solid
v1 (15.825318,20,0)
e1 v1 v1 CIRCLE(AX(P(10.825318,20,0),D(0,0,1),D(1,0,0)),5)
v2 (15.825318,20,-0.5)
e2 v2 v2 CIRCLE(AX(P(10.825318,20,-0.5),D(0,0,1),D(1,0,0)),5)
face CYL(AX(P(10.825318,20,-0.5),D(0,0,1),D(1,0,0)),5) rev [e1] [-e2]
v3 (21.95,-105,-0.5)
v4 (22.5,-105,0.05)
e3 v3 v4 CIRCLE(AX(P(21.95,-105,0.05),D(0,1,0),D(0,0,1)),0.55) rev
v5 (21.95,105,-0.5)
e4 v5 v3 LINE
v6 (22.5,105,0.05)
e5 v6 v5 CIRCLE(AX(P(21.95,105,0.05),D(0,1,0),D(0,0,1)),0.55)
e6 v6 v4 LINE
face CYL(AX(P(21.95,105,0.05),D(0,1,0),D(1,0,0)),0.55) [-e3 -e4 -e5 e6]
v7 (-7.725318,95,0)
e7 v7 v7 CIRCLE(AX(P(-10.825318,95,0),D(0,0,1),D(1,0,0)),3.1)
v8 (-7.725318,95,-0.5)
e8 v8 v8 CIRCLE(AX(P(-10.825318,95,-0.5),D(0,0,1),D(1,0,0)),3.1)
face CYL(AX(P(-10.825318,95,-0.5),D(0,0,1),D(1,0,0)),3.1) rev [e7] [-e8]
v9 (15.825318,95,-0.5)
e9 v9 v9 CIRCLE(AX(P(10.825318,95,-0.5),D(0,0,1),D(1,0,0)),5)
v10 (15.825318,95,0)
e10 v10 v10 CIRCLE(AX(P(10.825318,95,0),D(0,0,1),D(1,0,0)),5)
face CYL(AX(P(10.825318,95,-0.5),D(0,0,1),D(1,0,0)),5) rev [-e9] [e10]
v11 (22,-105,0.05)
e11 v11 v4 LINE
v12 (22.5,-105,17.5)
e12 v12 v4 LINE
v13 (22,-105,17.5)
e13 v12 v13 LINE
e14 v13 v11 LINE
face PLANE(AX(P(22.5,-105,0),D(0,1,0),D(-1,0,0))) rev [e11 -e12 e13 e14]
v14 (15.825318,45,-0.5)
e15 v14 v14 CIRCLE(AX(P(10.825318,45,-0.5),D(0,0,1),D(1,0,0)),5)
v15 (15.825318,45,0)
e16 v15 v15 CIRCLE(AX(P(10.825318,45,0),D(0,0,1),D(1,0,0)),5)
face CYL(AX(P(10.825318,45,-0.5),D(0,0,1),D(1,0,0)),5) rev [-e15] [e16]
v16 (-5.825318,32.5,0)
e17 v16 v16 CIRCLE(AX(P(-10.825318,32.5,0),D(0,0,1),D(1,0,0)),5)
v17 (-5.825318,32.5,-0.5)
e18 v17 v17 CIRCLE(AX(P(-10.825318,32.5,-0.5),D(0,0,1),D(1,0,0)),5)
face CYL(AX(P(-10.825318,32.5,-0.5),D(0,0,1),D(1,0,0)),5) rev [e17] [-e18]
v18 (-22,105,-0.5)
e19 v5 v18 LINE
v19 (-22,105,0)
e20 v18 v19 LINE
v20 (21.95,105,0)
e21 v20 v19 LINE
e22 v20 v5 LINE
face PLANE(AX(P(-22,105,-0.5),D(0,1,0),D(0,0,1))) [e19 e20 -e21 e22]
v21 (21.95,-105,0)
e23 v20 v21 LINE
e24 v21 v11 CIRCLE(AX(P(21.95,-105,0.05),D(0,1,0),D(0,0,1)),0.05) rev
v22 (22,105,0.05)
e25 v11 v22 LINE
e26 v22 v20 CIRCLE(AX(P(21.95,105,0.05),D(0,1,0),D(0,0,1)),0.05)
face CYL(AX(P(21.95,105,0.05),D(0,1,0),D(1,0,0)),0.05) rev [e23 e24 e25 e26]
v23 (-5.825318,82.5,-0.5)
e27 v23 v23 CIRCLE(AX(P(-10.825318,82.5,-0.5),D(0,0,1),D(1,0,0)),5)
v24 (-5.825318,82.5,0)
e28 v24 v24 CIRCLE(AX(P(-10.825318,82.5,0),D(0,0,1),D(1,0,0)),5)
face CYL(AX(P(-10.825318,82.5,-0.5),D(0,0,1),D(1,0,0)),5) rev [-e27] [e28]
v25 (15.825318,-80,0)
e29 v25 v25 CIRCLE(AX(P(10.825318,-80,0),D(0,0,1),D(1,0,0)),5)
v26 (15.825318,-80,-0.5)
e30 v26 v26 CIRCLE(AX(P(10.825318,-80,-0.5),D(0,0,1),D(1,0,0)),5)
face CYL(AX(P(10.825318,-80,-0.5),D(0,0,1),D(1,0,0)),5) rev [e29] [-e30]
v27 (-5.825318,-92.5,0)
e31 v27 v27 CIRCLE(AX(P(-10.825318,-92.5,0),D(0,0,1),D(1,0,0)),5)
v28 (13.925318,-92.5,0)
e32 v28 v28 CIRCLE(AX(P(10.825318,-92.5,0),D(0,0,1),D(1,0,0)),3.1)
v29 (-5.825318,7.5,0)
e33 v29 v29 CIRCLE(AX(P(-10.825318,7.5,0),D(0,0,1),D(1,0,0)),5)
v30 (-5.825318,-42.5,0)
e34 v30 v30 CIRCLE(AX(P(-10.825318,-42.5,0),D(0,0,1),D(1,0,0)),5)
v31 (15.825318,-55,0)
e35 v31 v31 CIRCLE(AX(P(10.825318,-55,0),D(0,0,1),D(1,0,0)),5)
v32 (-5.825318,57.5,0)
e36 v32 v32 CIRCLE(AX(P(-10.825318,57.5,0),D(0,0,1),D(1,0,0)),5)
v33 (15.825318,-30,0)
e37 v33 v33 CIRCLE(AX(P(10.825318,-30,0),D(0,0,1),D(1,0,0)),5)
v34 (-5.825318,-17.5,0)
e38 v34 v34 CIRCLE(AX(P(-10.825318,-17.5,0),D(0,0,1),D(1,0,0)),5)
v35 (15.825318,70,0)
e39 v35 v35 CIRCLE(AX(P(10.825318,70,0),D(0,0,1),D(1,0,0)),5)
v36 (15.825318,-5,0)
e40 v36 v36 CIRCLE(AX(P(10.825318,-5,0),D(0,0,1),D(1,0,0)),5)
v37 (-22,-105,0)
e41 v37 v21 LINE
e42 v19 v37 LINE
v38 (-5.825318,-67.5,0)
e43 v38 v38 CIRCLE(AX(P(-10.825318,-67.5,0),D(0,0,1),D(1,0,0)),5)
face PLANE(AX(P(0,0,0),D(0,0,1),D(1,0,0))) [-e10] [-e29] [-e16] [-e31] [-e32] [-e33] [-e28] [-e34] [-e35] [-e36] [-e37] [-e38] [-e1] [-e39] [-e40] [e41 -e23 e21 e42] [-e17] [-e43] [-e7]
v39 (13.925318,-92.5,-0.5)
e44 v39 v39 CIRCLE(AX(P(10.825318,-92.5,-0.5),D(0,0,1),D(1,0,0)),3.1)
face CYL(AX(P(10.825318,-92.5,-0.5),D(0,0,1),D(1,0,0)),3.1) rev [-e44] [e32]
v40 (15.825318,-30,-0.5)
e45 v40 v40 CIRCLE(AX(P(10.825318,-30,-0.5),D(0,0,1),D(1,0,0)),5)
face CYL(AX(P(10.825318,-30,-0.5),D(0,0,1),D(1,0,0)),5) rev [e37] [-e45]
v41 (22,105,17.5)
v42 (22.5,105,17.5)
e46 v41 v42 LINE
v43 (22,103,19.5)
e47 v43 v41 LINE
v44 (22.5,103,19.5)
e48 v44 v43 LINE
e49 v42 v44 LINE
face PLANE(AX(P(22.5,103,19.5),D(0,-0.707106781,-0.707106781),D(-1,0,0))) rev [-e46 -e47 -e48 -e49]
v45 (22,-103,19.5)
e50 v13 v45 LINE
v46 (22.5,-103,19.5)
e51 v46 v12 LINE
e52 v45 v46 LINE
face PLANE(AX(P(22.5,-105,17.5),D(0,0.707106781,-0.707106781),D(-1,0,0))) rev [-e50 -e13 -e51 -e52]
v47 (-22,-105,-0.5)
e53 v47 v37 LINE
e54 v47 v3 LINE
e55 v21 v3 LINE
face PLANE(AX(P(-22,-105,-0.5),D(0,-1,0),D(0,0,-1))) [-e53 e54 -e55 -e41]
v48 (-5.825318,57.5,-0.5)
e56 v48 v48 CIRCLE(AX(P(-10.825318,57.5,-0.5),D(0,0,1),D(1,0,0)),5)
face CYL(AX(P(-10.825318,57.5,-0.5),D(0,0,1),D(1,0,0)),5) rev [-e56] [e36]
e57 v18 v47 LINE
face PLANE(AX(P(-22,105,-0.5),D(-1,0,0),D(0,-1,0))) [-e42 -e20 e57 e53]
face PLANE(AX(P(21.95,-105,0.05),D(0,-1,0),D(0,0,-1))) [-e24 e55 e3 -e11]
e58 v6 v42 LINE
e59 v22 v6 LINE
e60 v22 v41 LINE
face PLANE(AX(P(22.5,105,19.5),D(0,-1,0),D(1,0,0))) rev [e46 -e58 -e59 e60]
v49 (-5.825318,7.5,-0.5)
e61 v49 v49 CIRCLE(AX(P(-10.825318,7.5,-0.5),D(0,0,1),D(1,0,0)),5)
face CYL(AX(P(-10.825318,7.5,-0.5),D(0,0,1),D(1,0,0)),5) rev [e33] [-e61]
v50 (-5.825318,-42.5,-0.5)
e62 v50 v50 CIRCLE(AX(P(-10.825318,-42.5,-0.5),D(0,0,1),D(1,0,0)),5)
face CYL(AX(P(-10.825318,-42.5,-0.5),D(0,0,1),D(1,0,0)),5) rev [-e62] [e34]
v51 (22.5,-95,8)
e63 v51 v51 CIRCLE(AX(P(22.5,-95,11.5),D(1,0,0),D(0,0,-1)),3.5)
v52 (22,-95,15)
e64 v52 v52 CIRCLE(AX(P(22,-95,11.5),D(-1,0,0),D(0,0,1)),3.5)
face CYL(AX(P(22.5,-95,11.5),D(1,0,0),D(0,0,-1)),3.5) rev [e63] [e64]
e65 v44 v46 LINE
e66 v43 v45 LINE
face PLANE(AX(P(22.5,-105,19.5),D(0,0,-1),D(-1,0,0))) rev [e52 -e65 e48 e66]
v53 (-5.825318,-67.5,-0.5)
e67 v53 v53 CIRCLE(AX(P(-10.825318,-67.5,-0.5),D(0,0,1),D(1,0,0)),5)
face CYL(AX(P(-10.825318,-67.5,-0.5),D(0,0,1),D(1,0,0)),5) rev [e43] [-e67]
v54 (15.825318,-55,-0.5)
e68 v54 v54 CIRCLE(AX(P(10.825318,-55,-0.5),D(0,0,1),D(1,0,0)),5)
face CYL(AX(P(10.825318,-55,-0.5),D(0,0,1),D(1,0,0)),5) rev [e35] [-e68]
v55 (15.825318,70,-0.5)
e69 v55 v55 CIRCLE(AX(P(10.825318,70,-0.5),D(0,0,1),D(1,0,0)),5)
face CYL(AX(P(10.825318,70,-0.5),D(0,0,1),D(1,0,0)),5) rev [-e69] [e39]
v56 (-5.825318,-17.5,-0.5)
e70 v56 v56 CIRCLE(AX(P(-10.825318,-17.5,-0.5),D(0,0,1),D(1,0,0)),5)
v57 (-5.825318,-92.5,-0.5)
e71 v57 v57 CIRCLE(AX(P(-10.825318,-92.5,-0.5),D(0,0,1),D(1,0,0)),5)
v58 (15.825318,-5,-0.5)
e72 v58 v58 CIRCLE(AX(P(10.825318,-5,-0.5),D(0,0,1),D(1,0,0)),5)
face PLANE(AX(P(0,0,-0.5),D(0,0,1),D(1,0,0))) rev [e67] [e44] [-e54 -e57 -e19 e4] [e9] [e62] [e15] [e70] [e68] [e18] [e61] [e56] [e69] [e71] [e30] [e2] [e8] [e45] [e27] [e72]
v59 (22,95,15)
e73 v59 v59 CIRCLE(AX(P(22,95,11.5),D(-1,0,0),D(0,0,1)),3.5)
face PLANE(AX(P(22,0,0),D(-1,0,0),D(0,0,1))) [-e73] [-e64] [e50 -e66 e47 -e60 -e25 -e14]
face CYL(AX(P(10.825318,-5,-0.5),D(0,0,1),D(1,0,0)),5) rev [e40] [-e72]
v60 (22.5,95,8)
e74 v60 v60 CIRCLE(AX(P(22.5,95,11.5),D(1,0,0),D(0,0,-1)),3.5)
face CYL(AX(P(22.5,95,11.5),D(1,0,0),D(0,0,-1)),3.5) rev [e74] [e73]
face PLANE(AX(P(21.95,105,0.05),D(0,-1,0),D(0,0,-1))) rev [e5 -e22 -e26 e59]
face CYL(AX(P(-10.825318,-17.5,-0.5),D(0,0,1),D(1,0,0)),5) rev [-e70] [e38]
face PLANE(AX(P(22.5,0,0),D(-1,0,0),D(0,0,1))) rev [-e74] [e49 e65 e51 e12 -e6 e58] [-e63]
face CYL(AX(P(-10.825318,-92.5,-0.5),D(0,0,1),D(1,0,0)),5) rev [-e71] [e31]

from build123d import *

# Parameters (mm, degrees)
SKETCH1_W                    = 44
SKETCH1_H                    = 210
BASE_FLANGE1_DEPTH           = 0.5
SKETCH6_R                    = 5
CUT_EXTRUDE1_DEPTH           = 108.281172626
LPATTERN1_COUNT              = 8
LPATTERN1_PITCH              = 25
EDGE_FLANGE1_STRIP_W         = 2.1
EDGE_FLANGE1_STRIP_H         = 0.5
EDGE_FLANGE1_STRIP_CUT_DEPTH = 210
EDGE_FLANGE1_DEPTH           = 210
F_7_0_7_DIAMETER_HOLE1_D     = 7
F_7_0_7_DIAMETER_HOLE1_DEPTH = 60
F_7_0_7_DIAMETER_HOLE1_TIP   = 2.103012167
BREAK_CORNER1_START          = 22
BREAK_CORNER1_DEPTH          = 0.5
CUT_EXTRUDE2_DEPTH           = 110.139818581
CUT_EXTRUDE2_DEPTH_BACK      = 110.139818581
SKETCH13_R                   = 3.1


# Read off the part's stored shape, not the designer's step: Break-Corner1
# Sheet-metal steps are written as plain solids
with BuildPart() as part:
    # Sketch1 → Base-Flange1 (new body)
    with BuildSketch(Plane.XY):
        Rectangle(SKETCH1_W, SKETCH1_H)
    extrude(amount=-BASE_FLANGE1_DEPTH)

    # Sketch6 → Cut-Extrude1 (cut, symmetric)
    with BuildSketch(Plane.XY):
        with Locations((10.825317547, 95)):
            Circle(SKETCH6_R)
        with Locations((-10.825317547, 82.5)):
            Circle(SKETCH6_R)
    cut_extrude1 = extrude(amount=CUT_EXTRUDE1_DEPTH, both=True, mode=Mode.SUBTRACT)

    # LPattern1: Cut-Extrude1 ×8
    with Locations(*[(0, -i * LPATTERN1_PITCH, 0) for i in range(1, LPATTERN1_COUNT)]):
        add(cut_extrude1, mode=Mode.SUBTRACT)

    # Edge-Flange1 strip (across the edge) → Edge-Flange1 strip cut (cut)
    with BuildSketch(Plane(origin=(22, -105, 0), x_dir=(-1, 0, 0), z_dir=(0, 1, 0))):
        with Locations((-1, -0.25)):
            Rectangle(EDGE_FLANGE1_STRIP_W, EDGE_FLANGE1_STRIP_H)
    extrude(amount=EDGE_FLANGE1_STRIP_CUT_DEPTH, mode=Mode.SUBTRACT)

    # Edge-Flange1 section (across the edge) → Edge-Flange1 (add)
    with BuildSketch(Plane(origin=(22, -105, 0), x_dir=(-1, 0, 0), z_dir=(0, 1, 0))):
        with BuildLine():
            Line((-0.5, 0.05), (-0.5, 19.5))
            Line((-0.5, 19.5), (0, 19.5))
            Line((0, 19.5), (0, 0.05))
            ThreePointArc((0, 0.05), (0.014644661, 0.014644661), (0.05, 0))
            Line((0.05, 0), (0.05, -0.5))
            ThreePointArc((0.05, -0.5), (-0.33890873, -0.33890873), (-0.5, 0.05))
        make_face()
    extrude(amount=EDGE_FLANGE1_DEPTH)

    # Ø7.0 (7) Diameter Hole1
    with Locations(Plane(origin=(22.5, 0, 0), x_dir=(0, 0, -1), z_dir=(1, 0, 0))):
        with Locations((-11.5, 95), (-11.5, -95)):
            Hole(F_7_0_7_DIAMETER_HOLE1_D / 2, depth=F_7_0_7_DIAMETER_HOLE1_DEPTH)
            with Locations((0, 0, -(F_7_0_7_DIAMETER_HOLE1_DEPTH + F_7_0_7_DIAMETER_HOLE1_TIP / 2))):  # 118° drill point
                Cone(0, F_7_0_7_DIAMETER_HOLE1_D / 2, F_7_0_7_DIAMETER_HOLE1_TIP, mode=Mode.SUBTRACT)

    # Break-Corner1 outline → Break-Corner1 (cut)
    with BuildSketch(Plane.YZ.offset(BREAK_CORNER1_START)):
        Polygon((-105, 19.5), (-105, 17.5), (-103, 19.5), align=None)
        Polygon((105, 19.5), (103, 19.5), (105, 17.5), align=None)
    extrude(amount=BREAK_CORNER1_DEPTH, mode=Mode.SUBTRACT)

    # Sketch13 → Cut-Extrude2 (cut, two sides: drawn at the far end of the back side and taken through both)
    with BuildSketch(Plane.XY.offset(-CUT_EXTRUDE2_DEPTH_BACK)):
        with Locations((-10.825317547, 95)):
            Circle(SKETCH13_R)
        with Locations((10.825317547, -92.5)):
            Circle(SKETCH13_R)
    extrude(amount=CUT_EXTRUDE2_DEPTH + CUT_EXTRUDE2_DEPTH_BACK, mode=Mode.SUBTRACT)


solid = part.part
